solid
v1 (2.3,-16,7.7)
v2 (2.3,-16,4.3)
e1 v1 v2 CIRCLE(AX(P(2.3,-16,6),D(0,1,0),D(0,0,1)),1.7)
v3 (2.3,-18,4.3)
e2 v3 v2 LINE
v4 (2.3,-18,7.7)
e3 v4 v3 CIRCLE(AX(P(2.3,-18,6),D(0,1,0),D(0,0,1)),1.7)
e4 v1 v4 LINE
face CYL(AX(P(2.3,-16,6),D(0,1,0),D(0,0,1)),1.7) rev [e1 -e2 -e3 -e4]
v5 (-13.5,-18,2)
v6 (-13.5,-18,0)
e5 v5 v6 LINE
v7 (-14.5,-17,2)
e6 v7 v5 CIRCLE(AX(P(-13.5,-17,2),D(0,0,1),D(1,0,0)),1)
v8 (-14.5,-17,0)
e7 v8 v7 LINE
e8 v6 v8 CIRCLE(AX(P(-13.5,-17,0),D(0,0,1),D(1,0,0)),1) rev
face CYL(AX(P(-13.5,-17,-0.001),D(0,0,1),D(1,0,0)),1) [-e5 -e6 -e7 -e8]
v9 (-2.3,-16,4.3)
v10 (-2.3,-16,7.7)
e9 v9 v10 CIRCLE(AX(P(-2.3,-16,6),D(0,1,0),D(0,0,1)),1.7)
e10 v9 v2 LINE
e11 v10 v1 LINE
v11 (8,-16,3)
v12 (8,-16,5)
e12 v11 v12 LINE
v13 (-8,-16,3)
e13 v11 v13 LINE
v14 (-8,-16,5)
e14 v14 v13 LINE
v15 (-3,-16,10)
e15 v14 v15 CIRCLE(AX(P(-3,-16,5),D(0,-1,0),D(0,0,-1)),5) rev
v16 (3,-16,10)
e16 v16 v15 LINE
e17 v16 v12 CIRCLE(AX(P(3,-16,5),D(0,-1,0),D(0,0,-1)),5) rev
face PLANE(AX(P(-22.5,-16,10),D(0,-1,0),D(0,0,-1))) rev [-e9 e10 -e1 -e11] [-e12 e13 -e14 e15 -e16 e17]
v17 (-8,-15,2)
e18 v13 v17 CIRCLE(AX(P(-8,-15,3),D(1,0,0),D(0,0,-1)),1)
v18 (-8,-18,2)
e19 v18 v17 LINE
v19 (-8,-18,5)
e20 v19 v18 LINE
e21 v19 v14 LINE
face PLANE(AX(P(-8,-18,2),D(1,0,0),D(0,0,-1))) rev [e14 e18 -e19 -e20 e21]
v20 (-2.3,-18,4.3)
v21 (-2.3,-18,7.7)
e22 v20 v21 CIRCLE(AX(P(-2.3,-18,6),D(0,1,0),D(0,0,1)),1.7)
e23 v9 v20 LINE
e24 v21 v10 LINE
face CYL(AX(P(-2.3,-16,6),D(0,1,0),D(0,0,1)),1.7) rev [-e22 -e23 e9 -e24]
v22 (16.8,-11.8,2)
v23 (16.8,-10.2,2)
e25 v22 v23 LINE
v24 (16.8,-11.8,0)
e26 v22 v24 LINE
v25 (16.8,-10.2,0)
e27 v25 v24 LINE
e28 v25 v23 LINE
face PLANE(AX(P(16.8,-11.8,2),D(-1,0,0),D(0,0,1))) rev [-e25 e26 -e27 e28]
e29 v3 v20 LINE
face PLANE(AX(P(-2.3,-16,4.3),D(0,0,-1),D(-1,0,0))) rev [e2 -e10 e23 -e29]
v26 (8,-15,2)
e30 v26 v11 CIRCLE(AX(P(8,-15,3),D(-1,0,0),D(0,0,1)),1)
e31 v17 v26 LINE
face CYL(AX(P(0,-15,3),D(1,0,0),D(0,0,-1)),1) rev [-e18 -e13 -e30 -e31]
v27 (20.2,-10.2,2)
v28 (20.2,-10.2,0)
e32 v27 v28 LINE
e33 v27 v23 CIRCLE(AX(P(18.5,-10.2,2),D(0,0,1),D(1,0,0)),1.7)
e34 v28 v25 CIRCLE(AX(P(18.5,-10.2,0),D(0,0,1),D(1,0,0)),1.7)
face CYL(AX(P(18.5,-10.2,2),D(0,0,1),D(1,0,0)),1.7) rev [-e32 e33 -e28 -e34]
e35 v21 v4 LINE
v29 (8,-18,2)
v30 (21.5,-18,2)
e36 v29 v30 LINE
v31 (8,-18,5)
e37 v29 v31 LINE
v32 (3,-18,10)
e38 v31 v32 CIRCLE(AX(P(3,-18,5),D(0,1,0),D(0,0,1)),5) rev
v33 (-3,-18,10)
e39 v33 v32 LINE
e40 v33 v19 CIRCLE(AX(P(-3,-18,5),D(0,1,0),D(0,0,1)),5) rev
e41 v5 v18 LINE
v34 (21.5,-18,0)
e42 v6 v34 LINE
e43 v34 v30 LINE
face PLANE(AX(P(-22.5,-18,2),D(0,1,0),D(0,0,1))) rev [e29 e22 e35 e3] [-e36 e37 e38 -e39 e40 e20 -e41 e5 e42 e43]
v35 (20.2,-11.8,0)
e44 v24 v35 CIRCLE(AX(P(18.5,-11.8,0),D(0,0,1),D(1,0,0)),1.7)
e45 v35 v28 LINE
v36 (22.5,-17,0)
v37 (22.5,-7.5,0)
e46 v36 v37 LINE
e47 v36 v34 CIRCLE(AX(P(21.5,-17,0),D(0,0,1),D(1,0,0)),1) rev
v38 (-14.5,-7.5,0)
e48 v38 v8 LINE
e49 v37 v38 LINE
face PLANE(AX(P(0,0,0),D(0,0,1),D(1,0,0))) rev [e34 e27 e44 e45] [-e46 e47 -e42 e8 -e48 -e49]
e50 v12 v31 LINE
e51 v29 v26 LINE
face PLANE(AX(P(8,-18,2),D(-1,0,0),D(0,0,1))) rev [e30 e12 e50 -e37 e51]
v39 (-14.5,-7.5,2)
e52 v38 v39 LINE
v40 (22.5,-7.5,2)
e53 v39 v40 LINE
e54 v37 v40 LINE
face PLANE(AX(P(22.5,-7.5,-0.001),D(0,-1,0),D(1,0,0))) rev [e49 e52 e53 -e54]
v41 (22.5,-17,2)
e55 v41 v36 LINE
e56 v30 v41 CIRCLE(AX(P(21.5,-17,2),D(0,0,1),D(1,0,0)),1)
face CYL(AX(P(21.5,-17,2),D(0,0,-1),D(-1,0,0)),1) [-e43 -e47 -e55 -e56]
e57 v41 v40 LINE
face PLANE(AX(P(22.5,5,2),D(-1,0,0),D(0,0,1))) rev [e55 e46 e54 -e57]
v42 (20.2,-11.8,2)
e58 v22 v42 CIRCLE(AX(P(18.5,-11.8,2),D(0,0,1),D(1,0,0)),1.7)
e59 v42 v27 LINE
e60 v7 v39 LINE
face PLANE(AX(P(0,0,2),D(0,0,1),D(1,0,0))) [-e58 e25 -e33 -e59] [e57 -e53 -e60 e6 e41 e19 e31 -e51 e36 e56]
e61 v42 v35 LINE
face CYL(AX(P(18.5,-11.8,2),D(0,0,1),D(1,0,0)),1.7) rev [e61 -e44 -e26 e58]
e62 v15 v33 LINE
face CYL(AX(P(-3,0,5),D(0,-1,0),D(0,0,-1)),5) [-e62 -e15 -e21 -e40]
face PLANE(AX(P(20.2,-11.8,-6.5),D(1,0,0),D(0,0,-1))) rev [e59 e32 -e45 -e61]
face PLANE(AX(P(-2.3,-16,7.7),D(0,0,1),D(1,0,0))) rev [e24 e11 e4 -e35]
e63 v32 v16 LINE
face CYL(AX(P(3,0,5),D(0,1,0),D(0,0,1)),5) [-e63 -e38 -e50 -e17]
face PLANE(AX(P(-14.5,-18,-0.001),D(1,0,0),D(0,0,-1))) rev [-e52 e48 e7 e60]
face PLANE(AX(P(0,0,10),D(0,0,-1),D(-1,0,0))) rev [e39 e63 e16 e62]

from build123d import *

# Parameters (mm, degrees)
SKETCH_1_W             = 45
SKETCH_1_H             = 10
EXTRUDE_1_DEPTH        = 2
SKETCH_2_W             = 45
SKETCH_2_H             = 23
EXTRUDE_2_DEPTH        = 2
SKETCH_4_W             = 45
SKETCH_4_H             = 2
EXTRUDE_3_DEPTH        = 10
HOLE_START             = -18
HOLE_WIZARD_M3_9_DEPTH = 2
HOLE_WIZARD_M3_1_DEPTH = 2
SKETCH_9_W             = 8
SKETCH_9_H             = 2
CUT_EXTRUDE_1_DEPTH    = 30.904013109
FILLET_2_R             = 3
SKETCH_10_W            = 45
SKETCH_10_H            = 7
CUT_EXTRUDE_2_DEPTH    = 10
SKETCH_11_W            = 45
SKETCH_11_H            = 16
EXTRUDE_4_DEPTH        = 2
HOLE_WIZARD_M3_5_DEPTH = 2
SKETCH_14_W            = 12.097238659
SKETCH_14_H            = 15.369634007
CUT_EXTRUDE_3_DEPTH    = 29.324018077
SKETCH_15_W            = 45
SKETCH_15_H            = 3
CUT_EXTRUDE_4_DEPTH    = 10
FILLET_8_R             = 5
FILLET_9_R             = 1
CUT_EXTRUDE_6_REACH    = 31.904
SKETCH_21_W            = 8
SKETCH_21_H            = 13
FILLET_10_R            = 1
CUT_EXTRUDE_8_REACH    = 31.904
SKETCH_23_W            = 44.634703277
SKETCH_23_H            = 2.5


# Read off the part's stored shape, not the designer's step: M3 间隙槽口9, M3 间隙槽口1, M3 间隙槽口5
with BuildPart() as part:
    # 草图1 → 凸台-拉伸1 (new body)
    with BuildSketch(Plane.XY):
        Rectangle(SKETCH_1_W, SKETCH_1_H)
    extrude(amount=EXTRUDE_1_DEPTH)

    # 草图2 → 凸台-拉伸2 (add)
    with BuildSketch(Plane.XY):
        with Locations((0, -6.5)):
            Rectangle(SKETCH_2_W, SKETCH_2_H)
    extrude(amount=EXTRUDE_2_DEPTH)

    # 草图4 → 凸台-拉伸3 (add)
    with BuildSketch(Plane.XY):
        with Locations((0, -17)):
            Rectangle(SKETCH_4_W, SKETCH_4_H)
    extrude(amount=EXTRUDE_3_DEPTH)

    # M3 间隙槽口9 outline → M3 间隙槽口9 (cut)
    with BuildSketch(Plane(origin=(0, 0, 0), x_dir=(1, 0, 0), z_dir=(0, 1, 0)).offset(HOLE_START)):
        with BuildLine():
            Line((-2.3, -7.7), (2.3, -7.7))
            ThreePointArc((2.3, -7.7), (4, -6), (2.3, -4.3))
            Line((2.3, -4.3), (-2.3, -4.3))
            ThreePointArc((-2.3, -4.3), (-4, -6), (-2.3, -7.7))
        make_face()
    extrude(amount=HOLE_WIZARD_M3_9_DEPTH, mode=Mode.SUBTRACT)

    # M3 间隙槽口1 outline → M3 间隙槽口1 (cut)
    with BuildSketch(Plane.XY):
        with BuildLine():
            ThreePointArc((20.2, 1.3), (18.5, 3), (16.8, 1.3))
            Line((16.8, 1.3), (16.8, -13.3))
            ThreePointArc((16.8, -13.3), (18.5, -15), (20.2, -13.3))
            Line((20.2, -13.3), (20.2, 1.3))
        make_face()
        with BuildLine():
            ThreePointArc((-16.8, 1.3), (-18.5, 3), (-20.2, 1.3))
            Line((-20.2, 1.3), (-20.2, -13.3))
            ThreePointArc((-20.2, -13.3), (-18.5, -15), (-16.8, -13.3))
            Line((-16.8, -13.3), (-16.8, 1.3))
        make_face()
    extrude(amount=HOLE_WIZARD_M3_1_DEPTH, mode=Mode.SUBTRACT)

    # 草图9 → 切除-拉伸1 (cut, through all)
    with BuildSketch(Plane.XY.offset(2)):
        with Locations((-18.5, -17)):
            Rectangle(SKETCH_9_W, SKETCH_9_H)
        with Locations((18.5, -17)):
            Rectangle(SKETCH_9_W, SKETCH_9_H)
    extrude(amount=CUT_EXTRUDE_1_DEPTH, mode=Mode.SUBTRACT)

    # 圆角2
    fillet_2_edges = [part.edges().sort_by_distance(p)[0] for p in [
        (-14.5, -17, 2),
        (14.5, -17, 2),
    ]]
    fillet(fillet_2_edges, radius=FILLET_2_R)

    # 草图10 → 切除-拉伸2 (cut)
    with BuildSketch(Plane.XY.offset(2)):
        with Locations((0, 1.5)):
            Rectangle(SKETCH_10_W, SKETCH_10_H)
    extrude(amount=-CUT_EXTRUDE_2_DEPTH, mode=Mode.SUBTRACT)

    # 草图11 → 凸台-拉伸4 (add)
    with BuildSketch(Plane.XY.offset(2)):
        with Locations((0, -10)):
            Rectangle(SKETCH_11_W, SKETCH_11_H)
    extrude(amount=-EXTRUDE_4_DEPTH)

    # M3 间隙槽口5 outline → M3 间隙槽口5 (cut)
    with BuildSketch(Plane.XY):
        with BuildLine():
            Line((16.8, -10.2), (16.8, -11.8))
            ThreePointArc((16.8, -11.8), (18.5, -13.5), (20.2, -11.8))
            Line((20.2, -11.8), (20.2, -10.2))
            ThreePointArc((20.2, -10.2), (18.5, -8.5), (16.8, -10.2))
        make_face()
        with BuildLine():
            Line((-20.2, -10.2), (-20.2, -11.8))
            ThreePointArc((-20.2, -11.8), (-18.5, -13.5), (-16.8, -11.8))
            Line((-16.8, -11.8), (-16.8, -10.2))
            ThreePointArc((-16.8, -10.2), (-18.5, -8.5), (-20.2, -10.2))
        make_face()
    extrude(amount=HOLE_WIZARD_M3_5_DEPTH, mode=Mode.SUBTRACT)

    # 草图14 → 切除-拉伸3 (cut, through all)
    with BuildSketch(Plane(origin=(0, -16, 0), x_dir=(1, 0, 0), z_dir=(0, 1, 0))):
        with Locations((-14.04861933, -9.684817004)):
            Rectangle(SKETCH_14_W, SKETCH_14_H)
        with Locations((14.04861933, -9.684817004)):
            Rectangle(SKETCH_14_W, SKETCH_14_H)
    extrude(amount=-CUT_EXTRUDE_3_DEPTH, mode=Mode.SUBTRACT)

    # 草图15 → 切除-拉伸4 (cut)
    with BuildSketch(Plane.XY.offset(2)):
        with Locations((0, -3.5)):
            Rectangle(SKETCH_15_W, SKETCH_15_H)
    extrude(amount=-CUT_EXTRUDE_4_DEPTH, mode=Mode.SUBTRACT)

    # 圆角8
    fillet_8_edges = [part.edges().sort_by_distance(p)[0] for p in [
        (8, -17, 10),
        (-8, -17, 10),
    ]]
    fillet(fillet_8_edges, radius=FILLET_8_R)

    # 圆角9
    fillet_9_edges = [part.edges().sort_by_distance(p)[0] for p in [
        (0, -16, 2),
    ]]
    fillet(fillet_9_edges, radius=FILLET_9_R)

    # 草图21 → 切除-拉伸6 (cut, up to next)
    with BuildSketch(Plane.XY.offset(2), mode=Mode.PRIVATE) as cut_extrude_6_sk1:
        with Locations((-18.5, -11.5)):
            Rectangle(SKETCH_21_W, SKETCH_21_H)
    cut_extrude_6_tool1 = extrude(cut_extrude_6_sk1.sketch, amount=-CUT_EXTRUDE_6_REACH, mode=Mode.PRIVATE) & part.part
    add(cut_extrude_6_tool1.solids().sort_by_distance((-18.5, -11.5, 2))[0], mode=Mode.SUBTRACT)

    # 圆角10
    fillet_10_edges = [part.edges().sort_by_distance(p)[0] for p in [
        (22.5, -18, 1),
        (22.5, -5, 1),
        (-14.5, -5, 1),
        (-14.5, -18, 1),
    ]]
    fillet(fillet_10_edges, radius=FILLET_10_R)

    # 草图23 → 切除-拉伸8 (cut, up to next)
    with BuildSketch(Plane.XY.offset(2), mode=Mode.PRIVATE) as cut_extrude_8_sk1:
        with Locations((0.182648362, -6.25)):
            Rectangle(SKETCH_23_W, SKETCH_23_H)
    cut_extrude_8_tool1 = extrude(cut_extrude_8_sk1.sketch, amount=-CUT_EXTRUDE_8_REACH, mode=Mode.PRIVATE) & part.part
    add(cut_extrude_8_tool1.solids().sort_by_distance((0.182648, -6.25, 2))[0], mode=Mode.SUBTRACT)


solid = part.part
